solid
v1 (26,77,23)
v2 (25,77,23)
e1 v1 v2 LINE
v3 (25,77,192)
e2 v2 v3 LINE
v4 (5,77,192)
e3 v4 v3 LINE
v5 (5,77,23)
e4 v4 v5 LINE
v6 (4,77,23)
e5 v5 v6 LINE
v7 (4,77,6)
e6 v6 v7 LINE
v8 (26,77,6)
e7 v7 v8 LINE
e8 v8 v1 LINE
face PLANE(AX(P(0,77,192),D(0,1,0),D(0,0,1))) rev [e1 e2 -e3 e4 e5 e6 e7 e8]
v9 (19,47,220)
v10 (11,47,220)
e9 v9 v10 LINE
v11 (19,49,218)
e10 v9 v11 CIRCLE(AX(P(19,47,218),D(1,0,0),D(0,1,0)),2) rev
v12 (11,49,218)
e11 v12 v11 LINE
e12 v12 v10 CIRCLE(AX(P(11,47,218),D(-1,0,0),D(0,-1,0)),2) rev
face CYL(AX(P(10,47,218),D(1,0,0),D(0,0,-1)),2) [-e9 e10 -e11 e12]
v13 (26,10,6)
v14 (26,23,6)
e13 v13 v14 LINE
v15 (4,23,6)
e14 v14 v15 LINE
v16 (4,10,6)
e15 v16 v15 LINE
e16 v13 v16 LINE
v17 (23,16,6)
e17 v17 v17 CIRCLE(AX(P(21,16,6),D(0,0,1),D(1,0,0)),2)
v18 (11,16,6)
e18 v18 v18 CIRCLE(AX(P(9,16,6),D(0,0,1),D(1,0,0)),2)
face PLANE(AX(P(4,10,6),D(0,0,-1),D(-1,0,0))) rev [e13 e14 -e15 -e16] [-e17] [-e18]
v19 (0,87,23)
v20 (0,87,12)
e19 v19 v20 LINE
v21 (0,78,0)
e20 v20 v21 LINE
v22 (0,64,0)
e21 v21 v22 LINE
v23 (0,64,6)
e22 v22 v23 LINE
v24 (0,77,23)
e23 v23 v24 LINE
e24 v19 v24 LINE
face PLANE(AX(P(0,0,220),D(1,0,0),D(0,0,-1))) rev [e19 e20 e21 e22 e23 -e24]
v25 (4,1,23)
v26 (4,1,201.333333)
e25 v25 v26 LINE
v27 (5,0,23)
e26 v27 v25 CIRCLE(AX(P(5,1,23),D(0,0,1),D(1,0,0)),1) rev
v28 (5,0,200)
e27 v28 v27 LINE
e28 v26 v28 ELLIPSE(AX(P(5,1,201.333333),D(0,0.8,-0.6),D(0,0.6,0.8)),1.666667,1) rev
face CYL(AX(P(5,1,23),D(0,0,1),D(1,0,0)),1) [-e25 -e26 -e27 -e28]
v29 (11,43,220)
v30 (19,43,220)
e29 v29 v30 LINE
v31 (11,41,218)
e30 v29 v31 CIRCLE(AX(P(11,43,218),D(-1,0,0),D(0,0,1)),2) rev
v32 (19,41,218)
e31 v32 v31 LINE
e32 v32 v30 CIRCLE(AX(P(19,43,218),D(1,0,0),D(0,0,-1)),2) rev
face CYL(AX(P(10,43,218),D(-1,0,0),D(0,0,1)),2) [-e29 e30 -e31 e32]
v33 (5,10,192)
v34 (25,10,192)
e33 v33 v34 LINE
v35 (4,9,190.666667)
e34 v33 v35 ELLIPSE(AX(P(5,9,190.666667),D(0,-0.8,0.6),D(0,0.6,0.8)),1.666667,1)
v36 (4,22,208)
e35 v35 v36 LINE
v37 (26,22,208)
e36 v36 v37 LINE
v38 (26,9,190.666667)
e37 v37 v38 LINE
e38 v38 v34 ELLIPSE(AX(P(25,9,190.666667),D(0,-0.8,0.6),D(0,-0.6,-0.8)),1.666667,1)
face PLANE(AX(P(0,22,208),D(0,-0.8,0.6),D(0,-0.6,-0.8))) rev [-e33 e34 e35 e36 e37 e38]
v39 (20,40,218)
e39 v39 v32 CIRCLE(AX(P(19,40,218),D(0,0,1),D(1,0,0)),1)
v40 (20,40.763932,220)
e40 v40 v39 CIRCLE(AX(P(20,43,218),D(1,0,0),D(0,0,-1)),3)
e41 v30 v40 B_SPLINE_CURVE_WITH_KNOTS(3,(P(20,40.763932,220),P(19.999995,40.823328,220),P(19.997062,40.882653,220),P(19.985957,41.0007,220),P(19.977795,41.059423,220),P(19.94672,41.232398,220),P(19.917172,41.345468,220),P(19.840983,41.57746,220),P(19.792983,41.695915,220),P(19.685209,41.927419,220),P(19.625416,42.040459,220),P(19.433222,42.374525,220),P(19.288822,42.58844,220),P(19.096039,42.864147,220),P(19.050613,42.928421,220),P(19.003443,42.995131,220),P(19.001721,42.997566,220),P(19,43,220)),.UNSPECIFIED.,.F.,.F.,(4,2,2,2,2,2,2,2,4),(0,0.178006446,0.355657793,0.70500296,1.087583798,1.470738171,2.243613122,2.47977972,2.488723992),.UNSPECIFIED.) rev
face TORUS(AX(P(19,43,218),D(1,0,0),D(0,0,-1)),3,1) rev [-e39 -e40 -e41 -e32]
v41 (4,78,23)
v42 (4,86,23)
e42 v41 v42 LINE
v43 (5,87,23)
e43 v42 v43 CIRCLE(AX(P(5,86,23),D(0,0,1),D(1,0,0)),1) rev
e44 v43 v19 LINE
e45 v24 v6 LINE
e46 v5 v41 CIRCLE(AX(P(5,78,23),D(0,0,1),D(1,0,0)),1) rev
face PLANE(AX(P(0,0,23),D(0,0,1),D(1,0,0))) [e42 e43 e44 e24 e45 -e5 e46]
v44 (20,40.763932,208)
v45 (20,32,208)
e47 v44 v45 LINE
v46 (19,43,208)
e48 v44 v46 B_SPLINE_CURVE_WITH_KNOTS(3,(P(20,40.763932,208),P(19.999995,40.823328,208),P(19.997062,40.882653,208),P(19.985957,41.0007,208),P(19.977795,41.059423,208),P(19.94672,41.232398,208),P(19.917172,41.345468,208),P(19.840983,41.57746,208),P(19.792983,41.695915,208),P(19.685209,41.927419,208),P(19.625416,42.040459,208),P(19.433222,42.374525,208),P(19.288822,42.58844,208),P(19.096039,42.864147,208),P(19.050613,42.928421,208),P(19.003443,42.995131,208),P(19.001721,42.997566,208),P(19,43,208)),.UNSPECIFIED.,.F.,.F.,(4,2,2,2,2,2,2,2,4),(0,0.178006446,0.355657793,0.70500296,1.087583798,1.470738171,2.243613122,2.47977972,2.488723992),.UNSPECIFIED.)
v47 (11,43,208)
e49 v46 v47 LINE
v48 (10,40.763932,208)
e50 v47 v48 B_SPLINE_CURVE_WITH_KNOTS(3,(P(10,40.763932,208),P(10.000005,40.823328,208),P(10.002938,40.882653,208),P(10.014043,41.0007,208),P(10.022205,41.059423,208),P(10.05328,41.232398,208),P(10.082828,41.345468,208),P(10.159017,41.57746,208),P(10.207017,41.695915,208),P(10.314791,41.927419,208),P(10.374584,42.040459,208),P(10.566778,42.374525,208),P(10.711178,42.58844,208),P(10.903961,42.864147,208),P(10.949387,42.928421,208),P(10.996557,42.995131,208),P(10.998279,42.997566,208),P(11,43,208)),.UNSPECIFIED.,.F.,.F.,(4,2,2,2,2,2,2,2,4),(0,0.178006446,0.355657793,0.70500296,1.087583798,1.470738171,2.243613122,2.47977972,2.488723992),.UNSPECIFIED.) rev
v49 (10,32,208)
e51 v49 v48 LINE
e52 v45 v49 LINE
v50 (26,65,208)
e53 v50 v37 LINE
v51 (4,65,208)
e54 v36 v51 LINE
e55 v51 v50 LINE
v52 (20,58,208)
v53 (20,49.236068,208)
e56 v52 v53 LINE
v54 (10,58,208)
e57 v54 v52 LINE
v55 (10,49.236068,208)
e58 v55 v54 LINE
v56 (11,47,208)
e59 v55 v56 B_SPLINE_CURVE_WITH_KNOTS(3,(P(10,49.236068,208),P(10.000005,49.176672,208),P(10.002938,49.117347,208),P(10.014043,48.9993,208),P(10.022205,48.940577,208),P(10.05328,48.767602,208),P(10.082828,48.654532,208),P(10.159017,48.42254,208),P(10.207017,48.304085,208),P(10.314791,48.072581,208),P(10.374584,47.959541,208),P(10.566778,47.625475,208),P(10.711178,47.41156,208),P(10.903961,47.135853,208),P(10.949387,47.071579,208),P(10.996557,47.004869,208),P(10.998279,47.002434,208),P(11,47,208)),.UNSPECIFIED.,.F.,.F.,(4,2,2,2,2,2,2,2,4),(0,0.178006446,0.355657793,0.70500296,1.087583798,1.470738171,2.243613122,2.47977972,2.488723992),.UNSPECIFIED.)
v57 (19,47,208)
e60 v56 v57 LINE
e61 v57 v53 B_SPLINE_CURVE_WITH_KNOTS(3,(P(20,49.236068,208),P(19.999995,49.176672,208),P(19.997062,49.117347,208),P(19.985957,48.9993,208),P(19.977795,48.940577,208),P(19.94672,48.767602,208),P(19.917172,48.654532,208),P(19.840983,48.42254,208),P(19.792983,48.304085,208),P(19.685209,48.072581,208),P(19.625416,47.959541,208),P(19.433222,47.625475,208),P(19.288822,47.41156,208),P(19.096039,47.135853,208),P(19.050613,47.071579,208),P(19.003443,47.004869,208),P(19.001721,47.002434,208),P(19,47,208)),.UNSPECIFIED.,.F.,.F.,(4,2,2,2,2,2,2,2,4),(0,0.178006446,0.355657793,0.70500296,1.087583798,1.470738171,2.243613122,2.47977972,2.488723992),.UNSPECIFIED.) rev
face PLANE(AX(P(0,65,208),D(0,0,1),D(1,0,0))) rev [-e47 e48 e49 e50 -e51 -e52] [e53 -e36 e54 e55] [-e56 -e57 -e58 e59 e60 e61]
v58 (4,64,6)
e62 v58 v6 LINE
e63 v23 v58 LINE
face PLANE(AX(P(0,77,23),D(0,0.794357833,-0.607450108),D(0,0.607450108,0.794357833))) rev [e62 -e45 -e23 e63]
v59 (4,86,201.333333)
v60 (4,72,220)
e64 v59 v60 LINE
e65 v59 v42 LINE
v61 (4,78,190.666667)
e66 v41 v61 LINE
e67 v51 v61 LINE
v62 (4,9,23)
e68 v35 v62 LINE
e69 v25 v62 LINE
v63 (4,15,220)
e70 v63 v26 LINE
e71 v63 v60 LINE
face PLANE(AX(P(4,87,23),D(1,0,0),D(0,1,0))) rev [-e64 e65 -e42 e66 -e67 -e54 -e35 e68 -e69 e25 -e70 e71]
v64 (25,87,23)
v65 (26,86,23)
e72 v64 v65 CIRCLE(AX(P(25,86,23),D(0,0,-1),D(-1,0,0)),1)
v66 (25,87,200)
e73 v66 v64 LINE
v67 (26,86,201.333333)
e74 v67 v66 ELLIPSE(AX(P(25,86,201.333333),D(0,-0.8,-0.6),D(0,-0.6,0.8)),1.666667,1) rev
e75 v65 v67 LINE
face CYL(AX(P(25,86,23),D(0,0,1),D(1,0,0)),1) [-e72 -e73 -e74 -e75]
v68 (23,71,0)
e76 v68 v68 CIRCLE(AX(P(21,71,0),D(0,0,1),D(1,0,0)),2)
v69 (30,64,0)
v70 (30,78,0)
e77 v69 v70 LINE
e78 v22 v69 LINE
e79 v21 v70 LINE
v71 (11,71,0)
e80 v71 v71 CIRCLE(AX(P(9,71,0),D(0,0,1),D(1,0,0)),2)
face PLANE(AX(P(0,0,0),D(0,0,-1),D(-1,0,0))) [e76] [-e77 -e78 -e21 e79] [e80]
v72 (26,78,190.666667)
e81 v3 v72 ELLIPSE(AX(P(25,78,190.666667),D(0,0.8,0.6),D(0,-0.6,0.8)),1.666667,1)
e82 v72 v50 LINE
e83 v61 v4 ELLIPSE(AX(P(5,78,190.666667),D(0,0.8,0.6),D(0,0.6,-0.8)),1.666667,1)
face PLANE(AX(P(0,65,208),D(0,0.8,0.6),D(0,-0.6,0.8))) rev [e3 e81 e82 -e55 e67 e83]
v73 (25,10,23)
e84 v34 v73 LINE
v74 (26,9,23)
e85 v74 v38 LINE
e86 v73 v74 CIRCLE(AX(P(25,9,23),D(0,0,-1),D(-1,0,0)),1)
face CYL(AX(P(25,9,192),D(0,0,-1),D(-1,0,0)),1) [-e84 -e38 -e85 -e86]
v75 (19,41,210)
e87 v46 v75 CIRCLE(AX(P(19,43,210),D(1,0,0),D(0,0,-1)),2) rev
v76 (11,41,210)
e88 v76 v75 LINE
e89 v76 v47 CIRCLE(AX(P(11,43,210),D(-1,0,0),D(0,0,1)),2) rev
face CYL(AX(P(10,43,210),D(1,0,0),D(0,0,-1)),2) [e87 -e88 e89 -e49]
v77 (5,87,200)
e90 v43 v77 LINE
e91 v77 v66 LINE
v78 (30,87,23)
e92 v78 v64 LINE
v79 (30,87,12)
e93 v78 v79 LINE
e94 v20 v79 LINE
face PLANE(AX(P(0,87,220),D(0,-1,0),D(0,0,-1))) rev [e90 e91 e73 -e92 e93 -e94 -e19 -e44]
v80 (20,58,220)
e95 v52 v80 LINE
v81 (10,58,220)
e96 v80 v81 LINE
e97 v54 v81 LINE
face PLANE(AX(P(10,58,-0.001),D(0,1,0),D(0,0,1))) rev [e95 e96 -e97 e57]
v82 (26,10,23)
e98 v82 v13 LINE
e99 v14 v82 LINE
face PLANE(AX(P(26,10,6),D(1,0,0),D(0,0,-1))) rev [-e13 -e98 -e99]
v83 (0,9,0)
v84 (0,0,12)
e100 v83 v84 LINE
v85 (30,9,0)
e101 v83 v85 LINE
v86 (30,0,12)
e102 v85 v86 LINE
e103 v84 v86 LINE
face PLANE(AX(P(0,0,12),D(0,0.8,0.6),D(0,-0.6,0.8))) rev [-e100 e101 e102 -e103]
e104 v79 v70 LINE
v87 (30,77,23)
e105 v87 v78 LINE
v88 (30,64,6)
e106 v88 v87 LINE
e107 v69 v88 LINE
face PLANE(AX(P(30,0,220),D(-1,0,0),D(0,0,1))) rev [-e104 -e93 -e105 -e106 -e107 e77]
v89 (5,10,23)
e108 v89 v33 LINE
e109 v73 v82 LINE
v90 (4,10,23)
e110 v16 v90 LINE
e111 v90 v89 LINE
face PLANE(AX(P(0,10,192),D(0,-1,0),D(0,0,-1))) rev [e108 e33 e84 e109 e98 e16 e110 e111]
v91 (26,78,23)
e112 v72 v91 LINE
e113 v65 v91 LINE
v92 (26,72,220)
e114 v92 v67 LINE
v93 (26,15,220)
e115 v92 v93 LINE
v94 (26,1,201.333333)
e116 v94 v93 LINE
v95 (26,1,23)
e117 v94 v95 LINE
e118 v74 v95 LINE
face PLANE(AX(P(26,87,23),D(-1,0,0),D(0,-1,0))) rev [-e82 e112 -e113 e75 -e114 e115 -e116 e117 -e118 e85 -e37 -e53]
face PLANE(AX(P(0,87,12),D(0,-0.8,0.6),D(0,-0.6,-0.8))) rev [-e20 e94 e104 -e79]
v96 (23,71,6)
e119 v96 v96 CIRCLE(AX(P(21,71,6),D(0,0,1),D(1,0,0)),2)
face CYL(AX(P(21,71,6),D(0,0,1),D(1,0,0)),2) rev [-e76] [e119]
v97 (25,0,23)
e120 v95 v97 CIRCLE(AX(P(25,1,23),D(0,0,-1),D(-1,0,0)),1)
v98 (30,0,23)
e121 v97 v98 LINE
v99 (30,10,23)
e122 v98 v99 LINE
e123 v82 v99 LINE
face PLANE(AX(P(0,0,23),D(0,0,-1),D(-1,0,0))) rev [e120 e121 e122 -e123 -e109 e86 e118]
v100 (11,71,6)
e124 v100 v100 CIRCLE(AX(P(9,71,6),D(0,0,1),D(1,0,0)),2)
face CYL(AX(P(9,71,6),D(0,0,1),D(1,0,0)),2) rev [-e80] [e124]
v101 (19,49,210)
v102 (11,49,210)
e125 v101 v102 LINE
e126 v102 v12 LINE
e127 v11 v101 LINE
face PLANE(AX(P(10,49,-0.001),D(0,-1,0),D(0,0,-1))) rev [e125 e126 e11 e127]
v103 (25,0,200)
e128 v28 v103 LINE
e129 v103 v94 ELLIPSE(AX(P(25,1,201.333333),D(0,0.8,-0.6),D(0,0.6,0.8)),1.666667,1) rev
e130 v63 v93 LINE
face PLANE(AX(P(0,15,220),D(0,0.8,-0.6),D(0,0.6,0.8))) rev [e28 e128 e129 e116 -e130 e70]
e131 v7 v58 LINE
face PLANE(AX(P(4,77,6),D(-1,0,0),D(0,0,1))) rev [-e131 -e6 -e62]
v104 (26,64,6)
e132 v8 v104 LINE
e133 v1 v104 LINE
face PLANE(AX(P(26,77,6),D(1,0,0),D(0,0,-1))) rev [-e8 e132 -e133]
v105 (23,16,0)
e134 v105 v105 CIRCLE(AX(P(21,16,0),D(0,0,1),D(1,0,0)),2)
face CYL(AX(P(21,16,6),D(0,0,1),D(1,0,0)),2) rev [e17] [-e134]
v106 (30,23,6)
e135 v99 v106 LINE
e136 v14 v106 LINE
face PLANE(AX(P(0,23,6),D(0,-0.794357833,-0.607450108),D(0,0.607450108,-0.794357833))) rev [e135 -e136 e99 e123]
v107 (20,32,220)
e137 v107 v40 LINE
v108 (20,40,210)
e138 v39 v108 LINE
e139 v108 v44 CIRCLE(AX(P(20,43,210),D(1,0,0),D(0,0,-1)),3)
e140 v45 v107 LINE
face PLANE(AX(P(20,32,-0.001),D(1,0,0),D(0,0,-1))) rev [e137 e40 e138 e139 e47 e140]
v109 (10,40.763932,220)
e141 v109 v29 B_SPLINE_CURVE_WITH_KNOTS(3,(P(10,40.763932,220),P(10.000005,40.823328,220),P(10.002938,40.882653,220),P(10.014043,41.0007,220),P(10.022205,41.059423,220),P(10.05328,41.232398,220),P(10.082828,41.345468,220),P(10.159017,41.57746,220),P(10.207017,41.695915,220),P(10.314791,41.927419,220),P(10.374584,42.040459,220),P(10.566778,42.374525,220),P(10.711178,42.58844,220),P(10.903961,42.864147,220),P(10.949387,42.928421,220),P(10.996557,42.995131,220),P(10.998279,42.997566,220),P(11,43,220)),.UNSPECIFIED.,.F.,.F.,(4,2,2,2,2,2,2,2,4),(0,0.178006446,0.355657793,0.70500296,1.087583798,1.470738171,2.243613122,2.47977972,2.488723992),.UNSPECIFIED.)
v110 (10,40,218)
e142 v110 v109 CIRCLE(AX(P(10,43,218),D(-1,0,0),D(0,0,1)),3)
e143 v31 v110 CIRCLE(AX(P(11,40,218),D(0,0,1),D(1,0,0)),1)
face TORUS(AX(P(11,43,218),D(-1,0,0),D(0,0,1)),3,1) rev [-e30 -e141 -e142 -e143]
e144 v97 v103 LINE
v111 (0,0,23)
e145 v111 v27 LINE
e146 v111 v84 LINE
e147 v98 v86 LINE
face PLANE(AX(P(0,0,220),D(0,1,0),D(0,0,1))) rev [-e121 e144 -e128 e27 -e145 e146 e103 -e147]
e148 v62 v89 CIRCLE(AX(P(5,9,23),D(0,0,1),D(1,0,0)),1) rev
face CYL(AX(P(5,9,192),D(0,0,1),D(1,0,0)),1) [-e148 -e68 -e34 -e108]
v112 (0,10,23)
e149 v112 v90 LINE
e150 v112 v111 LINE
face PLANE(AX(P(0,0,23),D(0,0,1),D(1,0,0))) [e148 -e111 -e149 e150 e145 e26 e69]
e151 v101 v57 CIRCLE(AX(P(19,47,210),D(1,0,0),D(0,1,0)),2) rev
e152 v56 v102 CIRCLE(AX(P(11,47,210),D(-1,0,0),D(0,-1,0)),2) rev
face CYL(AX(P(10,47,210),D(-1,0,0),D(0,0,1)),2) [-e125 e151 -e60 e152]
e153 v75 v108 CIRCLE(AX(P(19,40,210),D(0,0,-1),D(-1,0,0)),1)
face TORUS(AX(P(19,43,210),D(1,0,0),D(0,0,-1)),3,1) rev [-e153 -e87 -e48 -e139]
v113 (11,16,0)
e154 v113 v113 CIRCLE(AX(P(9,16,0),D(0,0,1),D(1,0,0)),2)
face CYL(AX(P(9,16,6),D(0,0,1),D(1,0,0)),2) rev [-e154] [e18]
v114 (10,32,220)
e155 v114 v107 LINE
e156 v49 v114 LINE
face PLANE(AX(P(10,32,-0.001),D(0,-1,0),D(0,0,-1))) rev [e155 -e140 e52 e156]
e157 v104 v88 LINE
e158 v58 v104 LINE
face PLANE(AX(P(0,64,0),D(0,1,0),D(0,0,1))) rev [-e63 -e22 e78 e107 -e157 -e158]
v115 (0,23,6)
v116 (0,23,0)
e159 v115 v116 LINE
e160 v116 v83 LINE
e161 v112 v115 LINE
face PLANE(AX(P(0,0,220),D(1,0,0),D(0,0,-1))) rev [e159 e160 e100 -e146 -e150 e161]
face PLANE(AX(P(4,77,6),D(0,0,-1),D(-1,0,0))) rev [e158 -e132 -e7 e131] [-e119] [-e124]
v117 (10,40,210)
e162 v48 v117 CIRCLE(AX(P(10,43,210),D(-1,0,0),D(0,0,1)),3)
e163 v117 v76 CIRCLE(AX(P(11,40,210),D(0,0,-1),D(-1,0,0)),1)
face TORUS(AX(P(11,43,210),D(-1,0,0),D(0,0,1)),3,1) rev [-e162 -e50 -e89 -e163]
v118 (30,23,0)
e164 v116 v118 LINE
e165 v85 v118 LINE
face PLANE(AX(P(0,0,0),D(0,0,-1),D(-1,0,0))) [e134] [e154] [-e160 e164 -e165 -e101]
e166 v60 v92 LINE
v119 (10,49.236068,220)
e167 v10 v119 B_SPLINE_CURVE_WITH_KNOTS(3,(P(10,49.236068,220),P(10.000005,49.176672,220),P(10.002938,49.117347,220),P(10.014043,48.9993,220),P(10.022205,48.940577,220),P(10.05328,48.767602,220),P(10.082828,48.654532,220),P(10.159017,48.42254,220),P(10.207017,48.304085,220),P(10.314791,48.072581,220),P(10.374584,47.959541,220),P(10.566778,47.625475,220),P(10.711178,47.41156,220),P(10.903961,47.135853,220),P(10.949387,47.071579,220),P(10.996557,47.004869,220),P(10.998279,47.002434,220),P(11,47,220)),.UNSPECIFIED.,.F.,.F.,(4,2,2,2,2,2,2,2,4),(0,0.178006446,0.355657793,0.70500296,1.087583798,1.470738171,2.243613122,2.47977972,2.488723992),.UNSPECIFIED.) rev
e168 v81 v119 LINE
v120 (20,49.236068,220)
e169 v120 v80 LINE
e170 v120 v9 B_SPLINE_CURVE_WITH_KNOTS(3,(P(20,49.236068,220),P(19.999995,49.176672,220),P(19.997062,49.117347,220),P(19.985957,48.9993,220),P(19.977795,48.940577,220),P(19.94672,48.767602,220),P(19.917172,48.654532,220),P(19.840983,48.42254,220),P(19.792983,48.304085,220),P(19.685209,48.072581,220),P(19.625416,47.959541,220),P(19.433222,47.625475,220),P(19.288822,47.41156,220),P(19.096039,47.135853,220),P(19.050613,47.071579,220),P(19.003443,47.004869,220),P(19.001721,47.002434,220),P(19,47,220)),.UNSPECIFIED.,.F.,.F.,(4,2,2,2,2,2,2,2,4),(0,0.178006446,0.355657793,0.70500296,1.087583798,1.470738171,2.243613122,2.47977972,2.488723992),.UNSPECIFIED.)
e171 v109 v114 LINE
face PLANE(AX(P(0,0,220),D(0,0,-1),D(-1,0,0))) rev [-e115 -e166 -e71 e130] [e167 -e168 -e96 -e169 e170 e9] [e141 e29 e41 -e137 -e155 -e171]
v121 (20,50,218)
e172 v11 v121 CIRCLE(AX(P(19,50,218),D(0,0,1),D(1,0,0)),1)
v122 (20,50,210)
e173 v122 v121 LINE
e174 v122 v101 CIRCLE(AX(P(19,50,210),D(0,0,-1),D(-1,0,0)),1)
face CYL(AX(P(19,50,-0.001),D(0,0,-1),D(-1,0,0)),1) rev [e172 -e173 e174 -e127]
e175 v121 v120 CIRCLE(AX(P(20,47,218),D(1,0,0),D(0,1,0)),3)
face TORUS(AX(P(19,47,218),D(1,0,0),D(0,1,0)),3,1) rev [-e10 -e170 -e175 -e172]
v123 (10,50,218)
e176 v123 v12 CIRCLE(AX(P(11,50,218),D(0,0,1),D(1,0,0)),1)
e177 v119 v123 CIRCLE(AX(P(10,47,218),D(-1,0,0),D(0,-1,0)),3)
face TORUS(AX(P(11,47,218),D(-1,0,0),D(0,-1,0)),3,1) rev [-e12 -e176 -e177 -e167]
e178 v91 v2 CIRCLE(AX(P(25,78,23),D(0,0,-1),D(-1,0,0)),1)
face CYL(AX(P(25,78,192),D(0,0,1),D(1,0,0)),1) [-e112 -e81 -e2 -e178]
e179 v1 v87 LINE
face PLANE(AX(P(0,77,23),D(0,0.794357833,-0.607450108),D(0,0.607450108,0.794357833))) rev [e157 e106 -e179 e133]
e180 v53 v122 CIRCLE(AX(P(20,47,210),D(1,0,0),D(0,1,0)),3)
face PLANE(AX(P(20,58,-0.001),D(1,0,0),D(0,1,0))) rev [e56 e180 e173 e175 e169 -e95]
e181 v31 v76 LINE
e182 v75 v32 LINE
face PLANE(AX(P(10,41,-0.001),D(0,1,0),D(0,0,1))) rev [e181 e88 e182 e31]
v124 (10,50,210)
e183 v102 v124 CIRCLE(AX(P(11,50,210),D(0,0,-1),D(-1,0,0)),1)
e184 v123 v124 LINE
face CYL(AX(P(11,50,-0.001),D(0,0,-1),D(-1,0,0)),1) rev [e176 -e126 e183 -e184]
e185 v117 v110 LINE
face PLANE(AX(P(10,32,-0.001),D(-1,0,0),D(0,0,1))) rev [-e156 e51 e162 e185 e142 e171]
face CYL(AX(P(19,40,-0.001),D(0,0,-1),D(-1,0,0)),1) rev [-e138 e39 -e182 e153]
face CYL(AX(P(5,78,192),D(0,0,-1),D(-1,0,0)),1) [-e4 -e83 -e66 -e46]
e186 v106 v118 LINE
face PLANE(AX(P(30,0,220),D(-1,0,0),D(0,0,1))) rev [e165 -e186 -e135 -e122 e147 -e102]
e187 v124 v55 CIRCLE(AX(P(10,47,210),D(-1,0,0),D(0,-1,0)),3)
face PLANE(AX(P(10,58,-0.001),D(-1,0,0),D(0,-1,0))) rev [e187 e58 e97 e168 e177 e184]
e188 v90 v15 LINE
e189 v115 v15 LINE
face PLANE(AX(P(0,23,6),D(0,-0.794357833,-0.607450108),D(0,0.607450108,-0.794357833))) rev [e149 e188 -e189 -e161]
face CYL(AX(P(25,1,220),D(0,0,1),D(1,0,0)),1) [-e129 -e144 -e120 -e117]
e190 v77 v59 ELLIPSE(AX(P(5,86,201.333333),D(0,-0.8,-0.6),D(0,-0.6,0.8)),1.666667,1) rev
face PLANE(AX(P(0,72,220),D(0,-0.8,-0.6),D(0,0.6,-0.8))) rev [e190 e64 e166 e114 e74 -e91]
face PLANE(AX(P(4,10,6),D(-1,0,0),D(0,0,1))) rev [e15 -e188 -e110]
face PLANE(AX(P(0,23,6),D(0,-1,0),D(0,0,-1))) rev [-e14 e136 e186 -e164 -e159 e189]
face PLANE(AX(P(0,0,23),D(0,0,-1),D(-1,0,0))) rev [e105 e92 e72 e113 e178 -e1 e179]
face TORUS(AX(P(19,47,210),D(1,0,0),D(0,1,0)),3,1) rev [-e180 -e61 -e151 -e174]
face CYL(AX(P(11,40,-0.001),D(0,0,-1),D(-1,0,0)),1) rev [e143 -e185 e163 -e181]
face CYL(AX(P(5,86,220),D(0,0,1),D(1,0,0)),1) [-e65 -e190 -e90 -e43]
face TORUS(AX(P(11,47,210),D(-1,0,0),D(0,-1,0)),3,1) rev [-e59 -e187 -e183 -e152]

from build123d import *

# Parameters (mm, degrees)
SKETCH1_W                 = 30
SKETCH1_H                 = 87
BOSS_EXTRUDE1_DEPTH       = 220
CUT_EXTRUDE1_DEPTH        = 239.472220604
SKETCH3_W                 = 22
SKETCH3_H                 = 22
CUT_EXTRUDE2_DEPTH        = 13
SKETCH4_W                 = 22
SKETCH4_H                 = 22
CUT_EXTRUDE3_DEPTH        = 13
CUT_EXTRUDE4_REACH        = 240.472
SKETCH5_W                 = 10
SKETCH5_H                 = 9
SKETCH6_W                 = 4
SKETCH6_H                 = 87
CUT_EXTRUDE5_DEPTH        = 197
F_4_0MM_DOWEL_HOLE1_D     = 4
F_4_0MM_DOWEL_HOLE1_DEPTH = 6
FILLET1_R                 = 2
FILLET2_R                 = 1


with BuildPart() as part:
    # Sketch1 → Boss-Extrude1 (new body)
    with BuildSketch(Plane.XY):
        with Locations((15, 43.5)):
            Rectangle(SKETCH1_W, SKETCH1_H)
    extrude(amount=BOSS_EXTRUDE1_DEPTH)

    # Sketch2 → Cut-Extrude1 (cut, through all)
    with BuildSketch(Plane(origin=(30, 0, 0), x_dir=(0, 0, -1), z_dir=(1, 0, 0))):
        Polygon((-192, 77), (-23, 77), (-6, 64), (0, 64), (0, 23), (-6, 23), (-23, 10), (-192, 10), (-208, 22), (-208, 65), align=None)
        Polygon((0, 87), (-12, 87), (0, 78), align=None)
        Polygon((0, 0), (-12, 0), (0, 9), align=None)
        Polygon((-220, 87), (-220, 72), (-200, 87), align=None)
        Polygon((-220, 0), (-220, 15), (-200, 0), align=None)
    extrude(amount=-CUT_EXTRUDE1_DEPTH, mode=Mode.SUBTRACT)

    # Sketch3 → Cut-Extrude2 (cut)
    with BuildSketch(Plane(origin=(0, 64, 0), x_dir=(-1, 0, 0), z_dir=(0, -1, 0))):
        with Locations((-15, -17)):
            Rectangle(SKETCH3_W, SKETCH3_H)
    extrude(amount=-CUT_EXTRUDE2_DEPTH, mode=Mode.SUBTRACT)

    # Sketch4 → Cut-Extrude3 (cut)
    with BuildSketch(Plane(origin=(0, 23, 0), x_dir=(1, 0, 0), z_dir=(0, 1, 0))):
        with Locations((15, -17)):
            Rectangle(SKETCH4_W, SKETCH4_H)
    extrude(amount=-CUT_EXTRUDE3_DEPTH, mode=Mode.SUBTRACT)

    # Sketch5 → Cut-Extrude4 (cut, up to next)
    with BuildSketch(Plane.XY.offset(220), mode=Mode.PRIVATE) as cut_extrude4_sk1:
        with Locations((15, 53.5)):
            Rectangle(SKETCH5_W, SKETCH5_H)
    cut_extrude4_tool1 = extrude(cut_extrude4_sk1.sketch, amount=-CUT_EXTRUDE4_REACH, mode=Mode.PRIVATE) & part.part
    # Sketch5 → Cut-Extrude4 (cut, up to next)
    with BuildSketch(Plane.XY.offset(220), mode=Mode.PRIVATE) as cut_extrude4_sk2:
        with Locations((15, 36.5)):
            Rectangle(SKETCH5_W, SKETCH5_H)
    cut_extrude4_tool2 = extrude(cut_extrude4_sk2.sketch, amount=-CUT_EXTRUDE4_REACH, mode=Mode.PRIVATE) & part.part
    add(cut_extrude4_tool1.solids().sort_by_distance((15, 53.5, 220))[0], mode=Mode.SUBTRACT)
    add(cut_extrude4_tool2.solids().sort_by_distance((15, 36.5, 220))[0], mode=Mode.SUBTRACT)

    # Sketch6 → Cut-Extrude5 (cut)
    with BuildSketch(Plane.XY.offset(220)):
        with Locations((2, 43.5)):
            Rectangle(SKETCH6_W, SKETCH6_H)
        with Locations((28, 43.5)):
            Rectangle(SKETCH6_W, SKETCH6_H)
    extrude(amount=-CUT_EXTRUDE5_DEPTH, mode=Mode.SUBTRACT)

    # Ø4.0mm Dowel Hole1
    with Locations(Plane.XY.offset(6)):
        with Locations((9, 16), (9, 71), (21, 71), (21, 16)):
            Hole(F_4_0MM_DOWEL_HOLE1_D / 2, depth=F_4_0MM_DOWEL_HOLE1_DEPTH)

    # Fillet1
    fillet1_edges = [part.edges().sort_by_distance(p)[0] for p in [
        (15, 49, 220),
        (15, 49, 208),
        (15, 41, 220),
        (15, 41, 208),
    ]]
    fillet(fillet1_edges, radius=FILLET1_R)

    # Fillet2
    # the kernel refuses this fillet: 1 mm, written as the material it adds along each edge
    with BuildSketch(Plane(origin=(10, 49, 218), x_dir=(1, 0, 0), z_dir=(0, 0, -1)), Plane(origin=(20, 41, 218), x_dir=(-1, 0, 0), z_dir=(0, 0, -1))) as fillet2_piece_1:
        with BuildLine():
            CenterArc((FILLET2_R, -FILLET2_R), FILLET2_R, 90, 90)
            Line((0, -FILLET2_R), (0, 0))
            Line((0, 0), (FILLET2_R, 0))
        make_face()
    extrude(amount=8)
    with BuildSketch(Plane(origin=(20, 49, 218), x_dir=(-1, 0, 0), z_dir=(0, 0, -1)), Plane(origin=(10, 41, 218), x_dir=(1, 0, 0), z_dir=(0, 0, -1))) as fillet2_piece_2:
        with BuildLine():
            CenterArc((FILLET2_R, FILLET2_R), FILLET2_R, 180, 90)
            Line((0, FILLET2_R), (0, 0))
            Line((0, 0), (FILLET2_R, 0))
        make_face()
    extrude(amount=8)
    with BuildSketch(Plane(origin=(10, 47, 210), x_dir=(0, -0.9491428341660849, -0.31484580408697216), z_dir=(0, -0.31484580408697216, 0.9491428341660849))) as fillet2_piece_3_section:
        with BuildLine():
            CenterArc((2 + FILLET2_R, FILLET2_R), FILLET2_R, 180, 90)
            Line((2 + FILLET2_R, 0), (2, 0))
            Line((2, 0), (2, FILLET2_R))
        make_face()
    fillet2_piece_3 = revolve(axis=Axis((10, 47, 210), (1, 0, 0)), revolution_arc=161.648494619, mode=Mode.PRIVATE)
    fillet2_piece_3 = split(fillet2_piece_3, bisect_by=Plane(origin=(10.272150961, 48.462196414, 208), z_dir=(0, 0, 1)), keep=Keep.TOP, mode=Mode.PRIVATE)
    add(fillet2_piece_3)
    with BuildSketch(Plane(origin=(20, 47, 210), x_dir=(0, -0.9491428341660849, -0.31484580408697216), z_dir=(0, -0.31484580408697216, 0.9491428341660849))) as fillet2_piece_4_section:
        with BuildLine():
            CenterArc((2 + FILLET2_R, -FILLET2_R), FILLET2_R, 90, 90)
            Line((2 + FILLET2_R, 0), (2, 0))
            Line((2, 0), (2, -FILLET2_R))
        make_face()
    fillet2_piece_4 = revolve(axis=Axis((20, 47, 210), (1, 0, 0)), revolution_arc=161.648494619, mode=Mode.PRIVATE)
    fillet2_piece_4 = split(fillet2_piece_4, bisect_by=Plane(origin=(19.727849107, 48.462196279, 208), z_dir=(0, 0, 1)), keep=Keep.TOP, mode=Mode.PRIVATE)
    add(fillet2_piece_4)
    with BuildSketch(Plane(origin=(20, 43, 210), x_dir=(0, 0.9491428341660849, -0.31484580408697216), z_dir=(0, 0.31484580408697216, 0.9491428341660849))) as fillet2_piece_5_section:
        with BuildLine():
            CenterArc((2 + FILLET2_R, FILLET2_R), FILLET2_R, 180, 90)
            Line((2 + FILLET2_R, 0), (2, 0))
            Line((2, 0), (2, FILLET2_R))
        make_face()
    fillet2_piece_5 = revolve(axis=Axis((20, 43, 210), (-1, 0, 0)), revolution_arc=161.648494619, mode=Mode.PRIVATE)
    fillet2_piece_5 = split(fillet2_piece_5, bisect_by=Plane(origin=(19.727848664, 41.537804063, 208), z_dir=(0, 0, 1)), keep=Keep.TOP, mode=Mode.PRIVATE)
    add(fillet2_piece_5)
    with BuildSketch(Plane(origin=(10, 43, 210), x_dir=(0, 0.9491428341660849, -0.31484580408697216), z_dir=(0, 0.31484580408697216, 0.9491428341660849))) as fillet2_piece_6_section:
        with BuildLine():
            CenterArc((2 + FILLET2_R, -FILLET2_R), FILLET2_R, 90, 90)
            Line((2 + FILLET2_R, 0), (2, 0))
            Line((2, 0), (2, -FILLET2_R))
        make_face()
    fillet2_piece_6 = revolve(axis=Axis((10, 43, 210), (-1, 0, 0)), revolution_arc=161.648494619, mode=Mode.PRIVATE)
    fillet2_piece_6 = split(fillet2_piece_6, bisect_by=Plane(origin=(10.272151404, 41.537803928, 208), z_dir=(0, 0, 1)), keep=Keep.TOP, mode=Mode.PRIVATE)
    add(fillet2_piece_6)
    with BuildSketch(Plane(origin=(20, 47, 218), x_dir=(0, -0.9491428341660849, 0.31484580408697216), z_dir=(0, -0.31484580408697216, -0.9491428341660849))) as fillet2_piece_7_section:
        with BuildLine():
            CenterArc((2 + FILLET2_R, FILLET2_R), FILLET2_R, 180, 90)
            Line((2 + FILLET2_R, 0), (2, 0))
            Line((2, 0), (2, FILLET2_R))
        make_face()
    fillet2_piece_7 = revolve(axis=Axis((20, 47, 218), (-1, 0, 0)), revolution_arc=161.648494619, mode=Mode.PRIVATE)
    fillet2_piece_7 = split(fillet2_piece_7, bisect_by=Plane(origin=(19.727849077, 48.462196209, 220), z_dir=(0, 0, -1)), keep=Keep.TOP, mode=Mode.PRIVATE)
    add(fillet2_piece_7)
    with BuildSketch(Plane(origin=(10, 47, 218), x_dir=(0, -0.9491428341660849, 0.31484580408697216), z_dir=(0, -0.31484580408697216, -0.9491428341660849))) as fillet2_piece_8_section:
        with BuildLine():
            CenterArc((2 + FILLET2_R, -FILLET2_R), FILLET2_R, 90, 90)
            Line((2, -FILLET2_R), (2, 0))
            Line((2, 0), (2 + FILLET2_R, 0))
        make_face()
    fillet2_piece_8 = revolve(axis=Axis((10, 47, 218), (-1, 0, 0)), revolution_arc=161.648494619, mode=Mode.PRIVATE)
    fillet2_piece_8 = split(fillet2_piece_8, bisect_by=Plane(origin=(10.272143952, 48.462199818, 220), z_dir=(0, 0, -1)), keep=Keep.TOP, mode=Mode.PRIVATE)
    add(fillet2_piece_8)
    with BuildSketch(Plane(origin=(10, 43, 218), x_dir=(0, 0.9491428341660849, 0.31484580408697216), z_dir=(0, 0.31484580408697216, -0.9491428341660849))) as fillet2_piece_9_section:
        with BuildLine():
            CenterArc((2 + FILLET2_R, FILLET2_R), FILLET2_R, 180, 90)
            Line((2 + FILLET2_R, 0), (2, 0))
            Line((2, 0), (2, FILLET2_R))
        make_face()
    fillet2_piece_9 = revolve(axis=Axis((10, 43, 218), (1, 0, 0)), revolution_arc=161.648494619, mode=Mode.PRIVATE)
    fillet2_piece_9 = split(fillet2_piece_9, bisect_by=Plane(origin=(10.272150964, 41.537803607, 220), z_dir=(0, 0, -1)), keep=Keep.TOP, mode=Mode.PRIVATE)
    add(fillet2_piece_9)
    with BuildSketch(Plane(origin=(20, 43, 218), x_dir=(0, 0.9491428341660849, 0.31484580408697216), z_dir=(0, 0.31484580408697216, -0.9491428341660849))) as fillet2_piece_10_section:
        with BuildLine():
            CenterArc((2 + FILLET2_R, -FILLET2_R), FILLET2_R, 90, 90)
            Line((2 + FILLET2_R, 0), (2, 0))
            Line((2, 0), (2, -FILLET2_R))
        make_face()
    fillet2_piece_10 = revolve(axis=Axis((20, 43, 218), (1, 0, 0)), revolution_arc=161.648494619, mode=Mode.PRIVATE)
    fillet2_piece_10 = split(fillet2_piece_10, bisect_by=Plane(origin=(19.727849077, 41.537803791, 220), z_dir=(0, 0, -1)), keep=Keep.TOP, mode=Mode.PRIVATE)
    add(fillet2_piece_10)
    # the kernel refuses this fillet: 1 mm, written as the material it takes off along each edge
    with BuildSketch(Plane(origin=(4, 0, 202.5), x_dir=(0, 1, 0), z_dir=(0, 0, -1)), Plane(origin=(26, 87, 202.5), x_dir=(0, -1, 0), z_dir=(0, 0, -1))) as fillet2_2_piece_1:
        with BuildLine():
            CenterArc((FILLET2_R, FILLET2_R), FILLET2_R, 180, 90)
            Line((0, FILLET2_R), (0, 0))
            Line((0, 0), (FILLET2_R, 0))
        make_face()
    extrude(amount=179.5, mode=Mode.SUBTRACT)
    with BuildSketch(Plane(origin=(4, 10, 23), x_dir=(0, -1, 0), z_dir=(0, 0, 1))) as fillet2_2_piece_2_section:
        with BuildLine():
            CenterArc((FILLET2_R, FILLET2_R), FILLET2_R, 180, 90)
            Line((0, FILLET2_R), (0, 0))
            Line((0, 0), (FILLET2_R, 0))
        make_face()
    fillet2_2_piece_2 = extrude(amount=171.5, mode=Mode.PRIVATE)
    fillet2_2_piece_2 = split(fillet2_2_piece_2, bisect_by=Plane(origin=(4.130770438, -71.137574021, 83.816567972), z_dir=(0, 0.8, -0.6)), keep=Keep.TOP, mode=Mode.PRIVATE)
    add(fillet2_2_piece_2, mode=Mode.SUBTRACT)
    with BuildSketch(Plane(origin=(4, 77, 194.5), x_dir=(0, 1, 0), z_dir=(0, 0, -1))) as fillet2_2_piece_3_section:
        with BuildLine():
            CenterArc((FILLET2_R, FILLET2_R), FILLET2_R, 180, 90)
            Line((0, FILLET2_R), (0, 0))
            Line((0, 0), (FILLET2_R, 0))
        make_face()
    fillet2_2_piece_3 = extrude(amount=171.5, mode=Mode.PRIVATE)
    fillet2_2_piece_3 = split(fillet2_2_piece_3, bisect_by=Plane(origin=(4.223692297, 117.641585147, 137.811219805), z_dir=(0, -0.8, -0.6)), keep=Keep.TOP, mode=Mode.PRIVATE)
    add(fillet2_2_piece_3, mode=Mode.SUBTRACT)
    with BuildSketch(Plane(origin=(4, 87, 202.5), x_dir=(0, -1, 0), z_dir=(0, 0, -1)), Plane(origin=(26, 0, 202.5), x_dir=(0, 1, 0), z_dir=(0, 0, -1))) as fillet2_2_piece_4:
        with BuildLine():
            CenterArc((FILLET2_R, -FILLET2_R), FILLET2_R, 90, 90)
            Line((0, -FILLET2_R), (0, 0))
            Line((0, 0), (FILLET2_R, 0))
        make_face()
    extrude(amount=179.5, mode=Mode.SUBTRACT)
    with BuildSketch(Plane(origin=(26, 10, 23), x_dir=(0, -1, 0), z_dir=(0, 0, 1))) as fillet2_2_piece_5_section:
        with BuildLine():
            CenterArc((FILLET2_R, -FILLET2_R), FILLET2_R, 90, 90)
            Line((0, -FILLET2_R), (0, 0))
            Line((0, 0), (FILLET2_R, 0))
        make_face()
    fillet2_2_piece_5 = extrude(amount=171.5, mode=Mode.PRIVATE)
    fillet2_2_piece_5 = split(fillet2_2_piece_5, bisect_by=Plane(origin=(25.869229562, -71.137574021, 83.816567972), z_dir=(0, 0.8, -0.6)), keep=Keep.TOP, mode=Mode.PRIVATE)
    add(fillet2_2_piece_5, mode=Mode.SUBTRACT)
    with BuildSketch(Plane(origin=(26, 77, 194.5), x_dir=(0, 1, 0), z_dir=(0, 0, -1))) as fillet2_2_piece_6_section:
        with BuildLine():
            CenterArc((FILLET2_R, -FILLET2_R), FILLET2_R, 90, 90)
            Line((0, -FILLET2_R), (0, 0))
            Line((0, 0), (FILLET2_R, 0))
        make_face()
    fillet2_2_piece_6 = extrude(amount=171.5, mode=Mode.PRIVATE)
    fillet2_2_piece_6 = split(fillet2_2_piece_6, bisect_by=Plane(origin=(25.776307703, 117.641585147, 137.811219805), z_dir=(0, -0.8, -0.6)), keep=Keep.TOP, mode=Mode.PRIVATE)
    add(fillet2_2_piece_6, mode=Mode.SUBTRACT)


solid = part.part
